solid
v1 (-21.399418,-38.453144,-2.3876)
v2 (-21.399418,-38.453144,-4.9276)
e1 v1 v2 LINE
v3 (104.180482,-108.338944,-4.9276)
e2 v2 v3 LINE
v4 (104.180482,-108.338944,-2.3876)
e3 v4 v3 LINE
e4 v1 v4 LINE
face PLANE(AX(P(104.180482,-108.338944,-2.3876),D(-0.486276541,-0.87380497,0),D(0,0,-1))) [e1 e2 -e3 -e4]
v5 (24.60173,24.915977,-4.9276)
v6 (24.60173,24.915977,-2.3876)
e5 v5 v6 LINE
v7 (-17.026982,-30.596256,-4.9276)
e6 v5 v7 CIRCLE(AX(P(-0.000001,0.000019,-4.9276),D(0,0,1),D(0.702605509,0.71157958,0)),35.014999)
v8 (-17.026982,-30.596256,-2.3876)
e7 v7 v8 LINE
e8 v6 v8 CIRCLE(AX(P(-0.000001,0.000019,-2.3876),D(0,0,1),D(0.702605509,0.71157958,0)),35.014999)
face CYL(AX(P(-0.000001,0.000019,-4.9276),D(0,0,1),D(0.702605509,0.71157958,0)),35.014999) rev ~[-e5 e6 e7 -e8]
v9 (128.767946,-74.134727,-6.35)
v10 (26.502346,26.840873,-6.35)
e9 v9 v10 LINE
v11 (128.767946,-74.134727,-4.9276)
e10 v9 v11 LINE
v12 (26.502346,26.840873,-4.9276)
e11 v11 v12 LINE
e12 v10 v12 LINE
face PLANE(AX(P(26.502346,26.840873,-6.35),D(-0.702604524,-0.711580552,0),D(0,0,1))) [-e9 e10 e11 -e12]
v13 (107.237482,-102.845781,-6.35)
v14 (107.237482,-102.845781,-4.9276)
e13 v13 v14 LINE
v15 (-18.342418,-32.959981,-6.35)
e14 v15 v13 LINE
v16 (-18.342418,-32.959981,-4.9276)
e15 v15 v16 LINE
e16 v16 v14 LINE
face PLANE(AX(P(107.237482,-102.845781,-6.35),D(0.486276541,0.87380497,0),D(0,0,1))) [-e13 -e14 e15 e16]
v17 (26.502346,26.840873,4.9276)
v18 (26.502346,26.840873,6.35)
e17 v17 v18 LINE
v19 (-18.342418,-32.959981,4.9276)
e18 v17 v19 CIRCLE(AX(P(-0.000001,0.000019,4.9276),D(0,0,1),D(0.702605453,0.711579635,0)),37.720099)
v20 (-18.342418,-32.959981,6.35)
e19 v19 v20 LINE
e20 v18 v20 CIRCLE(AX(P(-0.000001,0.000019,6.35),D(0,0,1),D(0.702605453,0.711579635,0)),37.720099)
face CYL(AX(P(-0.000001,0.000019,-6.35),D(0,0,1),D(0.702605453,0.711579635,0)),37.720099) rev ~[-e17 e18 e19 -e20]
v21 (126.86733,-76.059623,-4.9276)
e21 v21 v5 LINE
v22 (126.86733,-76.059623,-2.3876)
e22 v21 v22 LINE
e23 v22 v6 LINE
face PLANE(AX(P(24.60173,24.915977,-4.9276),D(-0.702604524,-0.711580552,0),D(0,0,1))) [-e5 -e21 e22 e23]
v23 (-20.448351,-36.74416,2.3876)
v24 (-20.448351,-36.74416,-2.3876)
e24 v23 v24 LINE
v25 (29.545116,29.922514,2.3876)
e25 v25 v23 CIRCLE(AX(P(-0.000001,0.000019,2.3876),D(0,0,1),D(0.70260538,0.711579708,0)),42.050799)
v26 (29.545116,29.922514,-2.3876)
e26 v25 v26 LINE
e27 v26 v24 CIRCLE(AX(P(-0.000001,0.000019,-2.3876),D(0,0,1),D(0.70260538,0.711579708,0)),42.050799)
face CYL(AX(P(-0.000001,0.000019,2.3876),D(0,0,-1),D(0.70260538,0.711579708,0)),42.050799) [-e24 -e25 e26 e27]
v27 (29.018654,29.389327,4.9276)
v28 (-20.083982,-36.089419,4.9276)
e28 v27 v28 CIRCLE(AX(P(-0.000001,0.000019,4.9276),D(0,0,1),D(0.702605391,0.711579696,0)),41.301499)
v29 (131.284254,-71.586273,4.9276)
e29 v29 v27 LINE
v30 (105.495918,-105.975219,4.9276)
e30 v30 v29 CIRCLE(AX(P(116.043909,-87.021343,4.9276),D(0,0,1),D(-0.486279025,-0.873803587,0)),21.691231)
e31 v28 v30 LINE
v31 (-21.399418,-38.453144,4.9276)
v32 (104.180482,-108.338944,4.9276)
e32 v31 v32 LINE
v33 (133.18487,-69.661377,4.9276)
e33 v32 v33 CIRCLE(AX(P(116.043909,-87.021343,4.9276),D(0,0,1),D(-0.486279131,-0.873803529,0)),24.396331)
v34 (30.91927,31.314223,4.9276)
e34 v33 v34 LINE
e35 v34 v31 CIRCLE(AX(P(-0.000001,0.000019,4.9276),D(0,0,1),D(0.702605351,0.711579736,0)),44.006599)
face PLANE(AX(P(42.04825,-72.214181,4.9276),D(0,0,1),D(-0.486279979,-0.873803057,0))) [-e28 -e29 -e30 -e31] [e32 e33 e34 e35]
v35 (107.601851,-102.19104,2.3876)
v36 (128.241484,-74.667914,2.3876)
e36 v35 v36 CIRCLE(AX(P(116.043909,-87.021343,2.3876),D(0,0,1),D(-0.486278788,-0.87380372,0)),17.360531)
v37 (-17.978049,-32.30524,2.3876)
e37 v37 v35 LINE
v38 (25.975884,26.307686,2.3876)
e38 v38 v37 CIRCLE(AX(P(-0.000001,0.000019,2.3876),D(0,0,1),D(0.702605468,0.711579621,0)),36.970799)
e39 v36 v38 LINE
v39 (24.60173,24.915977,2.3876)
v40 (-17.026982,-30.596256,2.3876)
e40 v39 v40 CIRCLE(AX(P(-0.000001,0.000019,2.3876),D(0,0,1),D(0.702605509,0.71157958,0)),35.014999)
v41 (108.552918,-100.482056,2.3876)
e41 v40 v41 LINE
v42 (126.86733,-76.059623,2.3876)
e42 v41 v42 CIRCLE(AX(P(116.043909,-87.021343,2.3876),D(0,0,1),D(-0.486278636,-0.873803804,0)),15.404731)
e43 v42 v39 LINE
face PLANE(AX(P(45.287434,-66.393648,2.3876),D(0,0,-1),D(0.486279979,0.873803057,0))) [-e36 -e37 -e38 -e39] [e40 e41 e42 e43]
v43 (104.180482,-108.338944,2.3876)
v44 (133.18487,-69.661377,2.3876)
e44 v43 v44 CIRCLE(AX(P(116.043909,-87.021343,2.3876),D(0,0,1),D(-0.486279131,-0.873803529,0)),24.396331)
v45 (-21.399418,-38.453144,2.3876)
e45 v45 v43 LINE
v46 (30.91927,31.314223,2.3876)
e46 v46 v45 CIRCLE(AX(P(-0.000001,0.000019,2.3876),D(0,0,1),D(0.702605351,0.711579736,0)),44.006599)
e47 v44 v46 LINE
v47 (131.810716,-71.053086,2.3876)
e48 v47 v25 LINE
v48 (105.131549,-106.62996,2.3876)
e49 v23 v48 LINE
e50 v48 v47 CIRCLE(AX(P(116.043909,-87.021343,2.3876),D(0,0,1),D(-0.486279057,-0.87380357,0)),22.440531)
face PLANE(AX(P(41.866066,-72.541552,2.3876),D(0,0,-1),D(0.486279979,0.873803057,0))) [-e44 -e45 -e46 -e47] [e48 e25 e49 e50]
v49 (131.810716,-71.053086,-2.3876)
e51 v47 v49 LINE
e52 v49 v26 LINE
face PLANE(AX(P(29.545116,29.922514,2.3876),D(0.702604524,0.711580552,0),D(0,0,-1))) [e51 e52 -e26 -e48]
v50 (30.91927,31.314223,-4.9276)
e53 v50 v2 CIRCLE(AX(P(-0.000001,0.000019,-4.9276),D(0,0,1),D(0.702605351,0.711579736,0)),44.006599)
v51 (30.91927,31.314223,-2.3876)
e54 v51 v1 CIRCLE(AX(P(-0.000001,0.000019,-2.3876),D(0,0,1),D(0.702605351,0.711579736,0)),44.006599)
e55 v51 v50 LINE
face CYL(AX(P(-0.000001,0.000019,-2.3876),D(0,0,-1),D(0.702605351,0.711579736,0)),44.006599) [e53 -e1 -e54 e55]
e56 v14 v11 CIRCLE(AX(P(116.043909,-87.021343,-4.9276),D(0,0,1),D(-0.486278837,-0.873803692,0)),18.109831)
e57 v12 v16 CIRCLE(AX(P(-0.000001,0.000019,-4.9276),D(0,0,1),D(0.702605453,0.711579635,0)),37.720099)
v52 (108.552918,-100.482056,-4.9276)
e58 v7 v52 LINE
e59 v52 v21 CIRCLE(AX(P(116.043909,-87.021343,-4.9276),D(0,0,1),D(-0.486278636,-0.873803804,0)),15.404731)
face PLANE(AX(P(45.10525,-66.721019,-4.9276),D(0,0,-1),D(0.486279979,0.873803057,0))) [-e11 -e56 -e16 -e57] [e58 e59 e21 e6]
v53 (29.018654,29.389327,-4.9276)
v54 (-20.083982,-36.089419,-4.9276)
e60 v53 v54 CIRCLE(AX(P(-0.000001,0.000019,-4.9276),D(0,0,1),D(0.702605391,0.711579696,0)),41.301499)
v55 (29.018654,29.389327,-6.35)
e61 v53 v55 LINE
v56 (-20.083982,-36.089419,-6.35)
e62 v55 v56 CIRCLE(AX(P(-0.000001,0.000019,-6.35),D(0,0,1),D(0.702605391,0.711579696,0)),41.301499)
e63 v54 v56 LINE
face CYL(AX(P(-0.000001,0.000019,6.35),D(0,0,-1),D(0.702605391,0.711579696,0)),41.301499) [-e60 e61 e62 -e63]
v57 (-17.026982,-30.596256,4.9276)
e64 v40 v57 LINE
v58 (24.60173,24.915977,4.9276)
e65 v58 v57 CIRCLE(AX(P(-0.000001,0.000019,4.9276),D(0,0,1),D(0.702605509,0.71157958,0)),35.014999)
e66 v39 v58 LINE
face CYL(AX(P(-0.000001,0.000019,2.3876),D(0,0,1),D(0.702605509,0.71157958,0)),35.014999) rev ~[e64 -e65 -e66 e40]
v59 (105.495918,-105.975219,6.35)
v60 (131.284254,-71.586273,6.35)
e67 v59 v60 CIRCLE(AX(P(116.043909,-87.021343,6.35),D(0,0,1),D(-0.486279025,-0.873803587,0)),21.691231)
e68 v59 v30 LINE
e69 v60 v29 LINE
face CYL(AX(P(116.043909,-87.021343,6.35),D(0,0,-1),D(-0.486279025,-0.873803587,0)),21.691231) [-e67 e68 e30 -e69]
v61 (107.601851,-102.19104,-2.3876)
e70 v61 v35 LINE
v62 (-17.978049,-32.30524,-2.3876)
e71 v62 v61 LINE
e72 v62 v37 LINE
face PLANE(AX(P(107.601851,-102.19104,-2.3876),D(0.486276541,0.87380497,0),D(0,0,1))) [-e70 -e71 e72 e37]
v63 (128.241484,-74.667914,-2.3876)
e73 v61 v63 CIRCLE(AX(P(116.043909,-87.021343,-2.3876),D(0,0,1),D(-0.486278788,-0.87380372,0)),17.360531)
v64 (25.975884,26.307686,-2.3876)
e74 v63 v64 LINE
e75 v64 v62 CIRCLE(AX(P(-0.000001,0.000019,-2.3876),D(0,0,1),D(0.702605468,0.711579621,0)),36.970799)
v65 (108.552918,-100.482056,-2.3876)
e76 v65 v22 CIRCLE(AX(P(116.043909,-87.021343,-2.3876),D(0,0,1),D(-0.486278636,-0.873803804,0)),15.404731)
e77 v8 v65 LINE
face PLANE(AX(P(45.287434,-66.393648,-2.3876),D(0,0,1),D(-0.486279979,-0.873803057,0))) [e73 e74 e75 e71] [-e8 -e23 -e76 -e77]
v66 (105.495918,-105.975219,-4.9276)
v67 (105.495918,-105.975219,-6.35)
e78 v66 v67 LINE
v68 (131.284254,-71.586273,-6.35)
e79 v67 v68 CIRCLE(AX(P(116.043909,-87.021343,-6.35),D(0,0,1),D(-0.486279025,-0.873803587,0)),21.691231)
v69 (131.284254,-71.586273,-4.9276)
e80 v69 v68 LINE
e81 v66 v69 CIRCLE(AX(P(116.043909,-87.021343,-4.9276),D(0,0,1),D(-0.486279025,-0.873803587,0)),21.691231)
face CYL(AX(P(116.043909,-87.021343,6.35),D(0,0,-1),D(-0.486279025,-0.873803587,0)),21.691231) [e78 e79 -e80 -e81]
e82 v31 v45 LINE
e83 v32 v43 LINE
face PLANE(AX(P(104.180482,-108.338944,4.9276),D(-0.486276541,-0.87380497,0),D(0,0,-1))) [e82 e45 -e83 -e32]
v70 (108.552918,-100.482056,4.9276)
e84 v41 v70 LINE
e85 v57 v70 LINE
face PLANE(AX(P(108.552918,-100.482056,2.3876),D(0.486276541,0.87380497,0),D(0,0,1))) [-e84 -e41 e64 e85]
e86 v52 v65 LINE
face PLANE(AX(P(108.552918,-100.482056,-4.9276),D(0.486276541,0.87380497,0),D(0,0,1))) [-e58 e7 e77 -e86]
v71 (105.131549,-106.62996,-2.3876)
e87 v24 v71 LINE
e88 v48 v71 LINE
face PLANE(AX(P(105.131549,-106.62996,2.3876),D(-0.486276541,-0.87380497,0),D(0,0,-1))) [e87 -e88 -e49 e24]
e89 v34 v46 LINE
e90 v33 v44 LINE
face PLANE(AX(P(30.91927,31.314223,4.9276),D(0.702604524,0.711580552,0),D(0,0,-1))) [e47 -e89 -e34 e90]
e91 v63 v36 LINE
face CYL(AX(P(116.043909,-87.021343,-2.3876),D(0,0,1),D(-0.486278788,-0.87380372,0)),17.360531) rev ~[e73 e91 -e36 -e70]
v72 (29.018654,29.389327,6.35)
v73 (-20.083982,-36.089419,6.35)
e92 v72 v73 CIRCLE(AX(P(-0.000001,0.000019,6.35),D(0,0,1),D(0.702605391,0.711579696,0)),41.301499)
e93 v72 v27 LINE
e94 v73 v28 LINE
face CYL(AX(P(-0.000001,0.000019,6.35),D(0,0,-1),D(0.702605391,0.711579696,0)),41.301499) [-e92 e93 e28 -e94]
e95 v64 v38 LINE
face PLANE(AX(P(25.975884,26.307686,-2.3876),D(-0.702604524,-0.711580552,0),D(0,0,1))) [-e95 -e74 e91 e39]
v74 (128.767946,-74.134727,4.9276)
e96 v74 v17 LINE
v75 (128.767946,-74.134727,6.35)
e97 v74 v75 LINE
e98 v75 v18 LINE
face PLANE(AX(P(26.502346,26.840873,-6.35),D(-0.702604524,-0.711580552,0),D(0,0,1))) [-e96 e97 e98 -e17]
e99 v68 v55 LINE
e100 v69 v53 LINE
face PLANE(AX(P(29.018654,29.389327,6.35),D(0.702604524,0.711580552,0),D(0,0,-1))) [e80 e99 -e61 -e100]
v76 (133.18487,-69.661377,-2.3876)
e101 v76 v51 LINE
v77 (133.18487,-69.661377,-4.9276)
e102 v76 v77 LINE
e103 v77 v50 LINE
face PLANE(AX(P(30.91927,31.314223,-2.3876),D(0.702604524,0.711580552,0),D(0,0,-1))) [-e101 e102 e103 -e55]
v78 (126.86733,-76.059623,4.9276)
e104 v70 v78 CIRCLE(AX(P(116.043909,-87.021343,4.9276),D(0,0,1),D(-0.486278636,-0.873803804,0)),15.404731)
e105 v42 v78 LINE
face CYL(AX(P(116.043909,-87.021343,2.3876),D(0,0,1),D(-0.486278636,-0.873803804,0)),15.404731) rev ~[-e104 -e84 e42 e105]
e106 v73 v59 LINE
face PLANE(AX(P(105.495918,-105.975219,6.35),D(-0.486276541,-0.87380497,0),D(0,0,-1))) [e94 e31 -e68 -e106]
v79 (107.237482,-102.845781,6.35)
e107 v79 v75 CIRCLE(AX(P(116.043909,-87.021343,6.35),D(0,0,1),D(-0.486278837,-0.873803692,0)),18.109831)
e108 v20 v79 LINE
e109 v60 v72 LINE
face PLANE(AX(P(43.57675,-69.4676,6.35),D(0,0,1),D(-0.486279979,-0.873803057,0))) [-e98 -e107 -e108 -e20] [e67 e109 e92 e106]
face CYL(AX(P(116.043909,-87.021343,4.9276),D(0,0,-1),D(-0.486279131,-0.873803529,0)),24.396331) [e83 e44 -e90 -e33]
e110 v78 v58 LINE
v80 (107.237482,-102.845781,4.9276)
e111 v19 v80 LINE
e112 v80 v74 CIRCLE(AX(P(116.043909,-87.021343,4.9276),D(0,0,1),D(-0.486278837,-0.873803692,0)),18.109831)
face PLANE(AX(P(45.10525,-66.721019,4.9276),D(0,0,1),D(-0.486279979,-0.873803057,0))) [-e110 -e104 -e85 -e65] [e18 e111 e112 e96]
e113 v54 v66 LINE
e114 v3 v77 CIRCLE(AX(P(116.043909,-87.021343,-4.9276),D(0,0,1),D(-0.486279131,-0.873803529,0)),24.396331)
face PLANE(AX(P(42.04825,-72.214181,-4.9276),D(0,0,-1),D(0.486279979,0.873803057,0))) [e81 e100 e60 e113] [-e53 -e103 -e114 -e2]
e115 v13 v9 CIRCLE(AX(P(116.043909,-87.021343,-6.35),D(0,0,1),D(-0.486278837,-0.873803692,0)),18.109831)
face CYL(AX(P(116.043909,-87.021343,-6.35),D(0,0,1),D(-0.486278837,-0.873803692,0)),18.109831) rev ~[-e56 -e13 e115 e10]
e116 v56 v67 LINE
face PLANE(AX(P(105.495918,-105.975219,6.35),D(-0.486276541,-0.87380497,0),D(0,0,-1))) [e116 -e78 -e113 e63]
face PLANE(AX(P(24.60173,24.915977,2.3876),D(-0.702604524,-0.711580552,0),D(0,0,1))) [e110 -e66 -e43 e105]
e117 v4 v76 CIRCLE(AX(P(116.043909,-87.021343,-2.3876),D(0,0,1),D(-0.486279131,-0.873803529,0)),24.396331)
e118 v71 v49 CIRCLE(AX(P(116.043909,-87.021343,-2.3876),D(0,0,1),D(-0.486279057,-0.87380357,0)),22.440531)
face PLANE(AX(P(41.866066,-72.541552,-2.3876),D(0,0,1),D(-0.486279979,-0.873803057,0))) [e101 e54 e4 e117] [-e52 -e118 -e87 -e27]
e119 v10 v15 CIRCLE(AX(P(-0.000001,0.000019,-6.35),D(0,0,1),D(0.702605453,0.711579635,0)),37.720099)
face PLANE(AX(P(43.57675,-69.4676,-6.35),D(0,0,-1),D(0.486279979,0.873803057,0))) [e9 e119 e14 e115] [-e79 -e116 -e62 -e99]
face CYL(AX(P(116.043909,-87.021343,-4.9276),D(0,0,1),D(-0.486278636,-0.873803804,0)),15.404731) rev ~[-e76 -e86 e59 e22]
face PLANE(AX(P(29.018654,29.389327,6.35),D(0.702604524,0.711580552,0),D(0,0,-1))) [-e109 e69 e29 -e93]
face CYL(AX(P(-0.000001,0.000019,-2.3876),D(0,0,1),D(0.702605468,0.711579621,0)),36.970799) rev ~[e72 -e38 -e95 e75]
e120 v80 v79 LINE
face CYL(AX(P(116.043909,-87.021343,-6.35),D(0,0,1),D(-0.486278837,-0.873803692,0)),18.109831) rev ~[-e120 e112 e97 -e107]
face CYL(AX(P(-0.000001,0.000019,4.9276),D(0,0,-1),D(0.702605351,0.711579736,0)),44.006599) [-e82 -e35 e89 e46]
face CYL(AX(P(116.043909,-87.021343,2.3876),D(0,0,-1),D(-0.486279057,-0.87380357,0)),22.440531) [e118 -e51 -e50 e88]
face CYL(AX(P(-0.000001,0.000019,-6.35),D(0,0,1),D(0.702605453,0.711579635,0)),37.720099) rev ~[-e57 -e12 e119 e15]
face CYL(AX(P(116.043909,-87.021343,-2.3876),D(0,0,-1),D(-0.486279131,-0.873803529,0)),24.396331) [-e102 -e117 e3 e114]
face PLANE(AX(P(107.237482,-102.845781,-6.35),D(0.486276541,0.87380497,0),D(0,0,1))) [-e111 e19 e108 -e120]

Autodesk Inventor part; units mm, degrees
ref_plane "Work Plane2" through (116.0439, -87.0213, 0) normal (-1, 0, 0) x (0, 0, 1)
ref_plane "Work Plane3" through (0, 0, 0) normal (0.8283994, -0.5601378, 0) x (0, 0, 1)
sketch "Path" plane through (0, 0, 0) normal (0, 0, 1) x (1, 0, 0)
  arc A0 (106.3667, -104.4105) -> (130.0261, -72.8605) centre (116.0439, -87.0213) ccw
  arc A1 (27.7605, 28.1151) -> (-19.2132, -34.5247) centre (0, 0) ccw
  line L0 (27.7605, 28.1151) -> (130.0261, -72.8605)
  line L1 (106.3667, -104.4105) -> (-19.2132, -34.5247)
  dimension "d31" = 8.9916
ref_plane "Section Plane" through (130.0261, -72.8605, 0) normal (-0.7115803, 0.7026047, 0) x (0, 0, 1)
sketch "Section Sketch" plane through (130.0261, -72.8605, 0) normal (-0.7115803, 0.7026047, 0) x (0, 0, 1)
  line L0 (-6.35, -1.7907) -> (6.35, -1.7907)
  line L1 (6.35, -1.7907) -> (6.35, 1.7907)
  line L2 (6.35, 1.7907) -> (-6.35, 1.7907)
  line L3 (-6.35, 1.7907) -> (-6.35, -1.7907)
  line L4 (-2.3876, -2.54) -> (2.3876, -2.54)
  line L5 (2.3876, -2.54) -> (2.3876, 2.54)
  line L6 (2.3876, 2.54) -> (-2.3876, 2.54)
  line L7 (-2.3876, 2.54) -> (-2.3876, -2.54)
  line L8 (-2.3876, 0) -> (2.3876, 0) construction
  line L9 (-4.9276, -4.4958) -> (-2.3876, -4.4958)
  line L10 (-2.3876, -4.4958) -> (-2.3876, 4.4958)
  line L11 (-2.3876, 4.4958) -> (-4.9276, 4.4958)
  line L12 (-4.9276, 4.4958) -> (-4.9276, -4.4958)
  line L13 (2.3876, -4.4958) -> (4.9276, -4.4958)
  line L14 (4.9276, -4.4958) -> (4.9276, 4.4958)
  line L15 (4.9276, 4.4958) -> (2.3876, 4.4958)
  line L16 (2.3876, 4.4958) -> (2.3876, -4.4958)
  line L17 (-6.35, 0) -> (6.35, 0) construction
  point P0 (0, 0)
  point P1 (0, 0)
  dimension "d21" = 3.5814
  dimension "d22" = 5.08
  dimension "d23" = 4.7752
  dimension "d24" = 2.54
  dimension "d31" = 8.9916
  dimension "d32" = 12.7
sweep "Solid" add profiles "Section Sketch" path "Path"
pattern_of_one "Strand Pattern"
equation "\"d21\" = da_d2"
equation "\"d22\" = da_d1"
equation "\"d23\" = da_b1"
equation "\"d24\" = da_t1 + da_t2"
equation "\"d30\" = da_pt"
equation "\"da_p\" = 9.525"
equation "\"da_b1\" = 4.7752"
equation "\"da_h2\" = 8.9916"
equation "\"da_h3\" = 7.7978"
equation "\"da_d1\" = 5.08"
equation "\"da_d2\" = 3.5814"
equation "\"da_pt\" = 10.1346"
equation "\"da_b\" = 12.7"
equation "\"da_t1\" = 1.27"
equation "\"da_t2\" = 1.27"
properties part number "Roller Chain"
